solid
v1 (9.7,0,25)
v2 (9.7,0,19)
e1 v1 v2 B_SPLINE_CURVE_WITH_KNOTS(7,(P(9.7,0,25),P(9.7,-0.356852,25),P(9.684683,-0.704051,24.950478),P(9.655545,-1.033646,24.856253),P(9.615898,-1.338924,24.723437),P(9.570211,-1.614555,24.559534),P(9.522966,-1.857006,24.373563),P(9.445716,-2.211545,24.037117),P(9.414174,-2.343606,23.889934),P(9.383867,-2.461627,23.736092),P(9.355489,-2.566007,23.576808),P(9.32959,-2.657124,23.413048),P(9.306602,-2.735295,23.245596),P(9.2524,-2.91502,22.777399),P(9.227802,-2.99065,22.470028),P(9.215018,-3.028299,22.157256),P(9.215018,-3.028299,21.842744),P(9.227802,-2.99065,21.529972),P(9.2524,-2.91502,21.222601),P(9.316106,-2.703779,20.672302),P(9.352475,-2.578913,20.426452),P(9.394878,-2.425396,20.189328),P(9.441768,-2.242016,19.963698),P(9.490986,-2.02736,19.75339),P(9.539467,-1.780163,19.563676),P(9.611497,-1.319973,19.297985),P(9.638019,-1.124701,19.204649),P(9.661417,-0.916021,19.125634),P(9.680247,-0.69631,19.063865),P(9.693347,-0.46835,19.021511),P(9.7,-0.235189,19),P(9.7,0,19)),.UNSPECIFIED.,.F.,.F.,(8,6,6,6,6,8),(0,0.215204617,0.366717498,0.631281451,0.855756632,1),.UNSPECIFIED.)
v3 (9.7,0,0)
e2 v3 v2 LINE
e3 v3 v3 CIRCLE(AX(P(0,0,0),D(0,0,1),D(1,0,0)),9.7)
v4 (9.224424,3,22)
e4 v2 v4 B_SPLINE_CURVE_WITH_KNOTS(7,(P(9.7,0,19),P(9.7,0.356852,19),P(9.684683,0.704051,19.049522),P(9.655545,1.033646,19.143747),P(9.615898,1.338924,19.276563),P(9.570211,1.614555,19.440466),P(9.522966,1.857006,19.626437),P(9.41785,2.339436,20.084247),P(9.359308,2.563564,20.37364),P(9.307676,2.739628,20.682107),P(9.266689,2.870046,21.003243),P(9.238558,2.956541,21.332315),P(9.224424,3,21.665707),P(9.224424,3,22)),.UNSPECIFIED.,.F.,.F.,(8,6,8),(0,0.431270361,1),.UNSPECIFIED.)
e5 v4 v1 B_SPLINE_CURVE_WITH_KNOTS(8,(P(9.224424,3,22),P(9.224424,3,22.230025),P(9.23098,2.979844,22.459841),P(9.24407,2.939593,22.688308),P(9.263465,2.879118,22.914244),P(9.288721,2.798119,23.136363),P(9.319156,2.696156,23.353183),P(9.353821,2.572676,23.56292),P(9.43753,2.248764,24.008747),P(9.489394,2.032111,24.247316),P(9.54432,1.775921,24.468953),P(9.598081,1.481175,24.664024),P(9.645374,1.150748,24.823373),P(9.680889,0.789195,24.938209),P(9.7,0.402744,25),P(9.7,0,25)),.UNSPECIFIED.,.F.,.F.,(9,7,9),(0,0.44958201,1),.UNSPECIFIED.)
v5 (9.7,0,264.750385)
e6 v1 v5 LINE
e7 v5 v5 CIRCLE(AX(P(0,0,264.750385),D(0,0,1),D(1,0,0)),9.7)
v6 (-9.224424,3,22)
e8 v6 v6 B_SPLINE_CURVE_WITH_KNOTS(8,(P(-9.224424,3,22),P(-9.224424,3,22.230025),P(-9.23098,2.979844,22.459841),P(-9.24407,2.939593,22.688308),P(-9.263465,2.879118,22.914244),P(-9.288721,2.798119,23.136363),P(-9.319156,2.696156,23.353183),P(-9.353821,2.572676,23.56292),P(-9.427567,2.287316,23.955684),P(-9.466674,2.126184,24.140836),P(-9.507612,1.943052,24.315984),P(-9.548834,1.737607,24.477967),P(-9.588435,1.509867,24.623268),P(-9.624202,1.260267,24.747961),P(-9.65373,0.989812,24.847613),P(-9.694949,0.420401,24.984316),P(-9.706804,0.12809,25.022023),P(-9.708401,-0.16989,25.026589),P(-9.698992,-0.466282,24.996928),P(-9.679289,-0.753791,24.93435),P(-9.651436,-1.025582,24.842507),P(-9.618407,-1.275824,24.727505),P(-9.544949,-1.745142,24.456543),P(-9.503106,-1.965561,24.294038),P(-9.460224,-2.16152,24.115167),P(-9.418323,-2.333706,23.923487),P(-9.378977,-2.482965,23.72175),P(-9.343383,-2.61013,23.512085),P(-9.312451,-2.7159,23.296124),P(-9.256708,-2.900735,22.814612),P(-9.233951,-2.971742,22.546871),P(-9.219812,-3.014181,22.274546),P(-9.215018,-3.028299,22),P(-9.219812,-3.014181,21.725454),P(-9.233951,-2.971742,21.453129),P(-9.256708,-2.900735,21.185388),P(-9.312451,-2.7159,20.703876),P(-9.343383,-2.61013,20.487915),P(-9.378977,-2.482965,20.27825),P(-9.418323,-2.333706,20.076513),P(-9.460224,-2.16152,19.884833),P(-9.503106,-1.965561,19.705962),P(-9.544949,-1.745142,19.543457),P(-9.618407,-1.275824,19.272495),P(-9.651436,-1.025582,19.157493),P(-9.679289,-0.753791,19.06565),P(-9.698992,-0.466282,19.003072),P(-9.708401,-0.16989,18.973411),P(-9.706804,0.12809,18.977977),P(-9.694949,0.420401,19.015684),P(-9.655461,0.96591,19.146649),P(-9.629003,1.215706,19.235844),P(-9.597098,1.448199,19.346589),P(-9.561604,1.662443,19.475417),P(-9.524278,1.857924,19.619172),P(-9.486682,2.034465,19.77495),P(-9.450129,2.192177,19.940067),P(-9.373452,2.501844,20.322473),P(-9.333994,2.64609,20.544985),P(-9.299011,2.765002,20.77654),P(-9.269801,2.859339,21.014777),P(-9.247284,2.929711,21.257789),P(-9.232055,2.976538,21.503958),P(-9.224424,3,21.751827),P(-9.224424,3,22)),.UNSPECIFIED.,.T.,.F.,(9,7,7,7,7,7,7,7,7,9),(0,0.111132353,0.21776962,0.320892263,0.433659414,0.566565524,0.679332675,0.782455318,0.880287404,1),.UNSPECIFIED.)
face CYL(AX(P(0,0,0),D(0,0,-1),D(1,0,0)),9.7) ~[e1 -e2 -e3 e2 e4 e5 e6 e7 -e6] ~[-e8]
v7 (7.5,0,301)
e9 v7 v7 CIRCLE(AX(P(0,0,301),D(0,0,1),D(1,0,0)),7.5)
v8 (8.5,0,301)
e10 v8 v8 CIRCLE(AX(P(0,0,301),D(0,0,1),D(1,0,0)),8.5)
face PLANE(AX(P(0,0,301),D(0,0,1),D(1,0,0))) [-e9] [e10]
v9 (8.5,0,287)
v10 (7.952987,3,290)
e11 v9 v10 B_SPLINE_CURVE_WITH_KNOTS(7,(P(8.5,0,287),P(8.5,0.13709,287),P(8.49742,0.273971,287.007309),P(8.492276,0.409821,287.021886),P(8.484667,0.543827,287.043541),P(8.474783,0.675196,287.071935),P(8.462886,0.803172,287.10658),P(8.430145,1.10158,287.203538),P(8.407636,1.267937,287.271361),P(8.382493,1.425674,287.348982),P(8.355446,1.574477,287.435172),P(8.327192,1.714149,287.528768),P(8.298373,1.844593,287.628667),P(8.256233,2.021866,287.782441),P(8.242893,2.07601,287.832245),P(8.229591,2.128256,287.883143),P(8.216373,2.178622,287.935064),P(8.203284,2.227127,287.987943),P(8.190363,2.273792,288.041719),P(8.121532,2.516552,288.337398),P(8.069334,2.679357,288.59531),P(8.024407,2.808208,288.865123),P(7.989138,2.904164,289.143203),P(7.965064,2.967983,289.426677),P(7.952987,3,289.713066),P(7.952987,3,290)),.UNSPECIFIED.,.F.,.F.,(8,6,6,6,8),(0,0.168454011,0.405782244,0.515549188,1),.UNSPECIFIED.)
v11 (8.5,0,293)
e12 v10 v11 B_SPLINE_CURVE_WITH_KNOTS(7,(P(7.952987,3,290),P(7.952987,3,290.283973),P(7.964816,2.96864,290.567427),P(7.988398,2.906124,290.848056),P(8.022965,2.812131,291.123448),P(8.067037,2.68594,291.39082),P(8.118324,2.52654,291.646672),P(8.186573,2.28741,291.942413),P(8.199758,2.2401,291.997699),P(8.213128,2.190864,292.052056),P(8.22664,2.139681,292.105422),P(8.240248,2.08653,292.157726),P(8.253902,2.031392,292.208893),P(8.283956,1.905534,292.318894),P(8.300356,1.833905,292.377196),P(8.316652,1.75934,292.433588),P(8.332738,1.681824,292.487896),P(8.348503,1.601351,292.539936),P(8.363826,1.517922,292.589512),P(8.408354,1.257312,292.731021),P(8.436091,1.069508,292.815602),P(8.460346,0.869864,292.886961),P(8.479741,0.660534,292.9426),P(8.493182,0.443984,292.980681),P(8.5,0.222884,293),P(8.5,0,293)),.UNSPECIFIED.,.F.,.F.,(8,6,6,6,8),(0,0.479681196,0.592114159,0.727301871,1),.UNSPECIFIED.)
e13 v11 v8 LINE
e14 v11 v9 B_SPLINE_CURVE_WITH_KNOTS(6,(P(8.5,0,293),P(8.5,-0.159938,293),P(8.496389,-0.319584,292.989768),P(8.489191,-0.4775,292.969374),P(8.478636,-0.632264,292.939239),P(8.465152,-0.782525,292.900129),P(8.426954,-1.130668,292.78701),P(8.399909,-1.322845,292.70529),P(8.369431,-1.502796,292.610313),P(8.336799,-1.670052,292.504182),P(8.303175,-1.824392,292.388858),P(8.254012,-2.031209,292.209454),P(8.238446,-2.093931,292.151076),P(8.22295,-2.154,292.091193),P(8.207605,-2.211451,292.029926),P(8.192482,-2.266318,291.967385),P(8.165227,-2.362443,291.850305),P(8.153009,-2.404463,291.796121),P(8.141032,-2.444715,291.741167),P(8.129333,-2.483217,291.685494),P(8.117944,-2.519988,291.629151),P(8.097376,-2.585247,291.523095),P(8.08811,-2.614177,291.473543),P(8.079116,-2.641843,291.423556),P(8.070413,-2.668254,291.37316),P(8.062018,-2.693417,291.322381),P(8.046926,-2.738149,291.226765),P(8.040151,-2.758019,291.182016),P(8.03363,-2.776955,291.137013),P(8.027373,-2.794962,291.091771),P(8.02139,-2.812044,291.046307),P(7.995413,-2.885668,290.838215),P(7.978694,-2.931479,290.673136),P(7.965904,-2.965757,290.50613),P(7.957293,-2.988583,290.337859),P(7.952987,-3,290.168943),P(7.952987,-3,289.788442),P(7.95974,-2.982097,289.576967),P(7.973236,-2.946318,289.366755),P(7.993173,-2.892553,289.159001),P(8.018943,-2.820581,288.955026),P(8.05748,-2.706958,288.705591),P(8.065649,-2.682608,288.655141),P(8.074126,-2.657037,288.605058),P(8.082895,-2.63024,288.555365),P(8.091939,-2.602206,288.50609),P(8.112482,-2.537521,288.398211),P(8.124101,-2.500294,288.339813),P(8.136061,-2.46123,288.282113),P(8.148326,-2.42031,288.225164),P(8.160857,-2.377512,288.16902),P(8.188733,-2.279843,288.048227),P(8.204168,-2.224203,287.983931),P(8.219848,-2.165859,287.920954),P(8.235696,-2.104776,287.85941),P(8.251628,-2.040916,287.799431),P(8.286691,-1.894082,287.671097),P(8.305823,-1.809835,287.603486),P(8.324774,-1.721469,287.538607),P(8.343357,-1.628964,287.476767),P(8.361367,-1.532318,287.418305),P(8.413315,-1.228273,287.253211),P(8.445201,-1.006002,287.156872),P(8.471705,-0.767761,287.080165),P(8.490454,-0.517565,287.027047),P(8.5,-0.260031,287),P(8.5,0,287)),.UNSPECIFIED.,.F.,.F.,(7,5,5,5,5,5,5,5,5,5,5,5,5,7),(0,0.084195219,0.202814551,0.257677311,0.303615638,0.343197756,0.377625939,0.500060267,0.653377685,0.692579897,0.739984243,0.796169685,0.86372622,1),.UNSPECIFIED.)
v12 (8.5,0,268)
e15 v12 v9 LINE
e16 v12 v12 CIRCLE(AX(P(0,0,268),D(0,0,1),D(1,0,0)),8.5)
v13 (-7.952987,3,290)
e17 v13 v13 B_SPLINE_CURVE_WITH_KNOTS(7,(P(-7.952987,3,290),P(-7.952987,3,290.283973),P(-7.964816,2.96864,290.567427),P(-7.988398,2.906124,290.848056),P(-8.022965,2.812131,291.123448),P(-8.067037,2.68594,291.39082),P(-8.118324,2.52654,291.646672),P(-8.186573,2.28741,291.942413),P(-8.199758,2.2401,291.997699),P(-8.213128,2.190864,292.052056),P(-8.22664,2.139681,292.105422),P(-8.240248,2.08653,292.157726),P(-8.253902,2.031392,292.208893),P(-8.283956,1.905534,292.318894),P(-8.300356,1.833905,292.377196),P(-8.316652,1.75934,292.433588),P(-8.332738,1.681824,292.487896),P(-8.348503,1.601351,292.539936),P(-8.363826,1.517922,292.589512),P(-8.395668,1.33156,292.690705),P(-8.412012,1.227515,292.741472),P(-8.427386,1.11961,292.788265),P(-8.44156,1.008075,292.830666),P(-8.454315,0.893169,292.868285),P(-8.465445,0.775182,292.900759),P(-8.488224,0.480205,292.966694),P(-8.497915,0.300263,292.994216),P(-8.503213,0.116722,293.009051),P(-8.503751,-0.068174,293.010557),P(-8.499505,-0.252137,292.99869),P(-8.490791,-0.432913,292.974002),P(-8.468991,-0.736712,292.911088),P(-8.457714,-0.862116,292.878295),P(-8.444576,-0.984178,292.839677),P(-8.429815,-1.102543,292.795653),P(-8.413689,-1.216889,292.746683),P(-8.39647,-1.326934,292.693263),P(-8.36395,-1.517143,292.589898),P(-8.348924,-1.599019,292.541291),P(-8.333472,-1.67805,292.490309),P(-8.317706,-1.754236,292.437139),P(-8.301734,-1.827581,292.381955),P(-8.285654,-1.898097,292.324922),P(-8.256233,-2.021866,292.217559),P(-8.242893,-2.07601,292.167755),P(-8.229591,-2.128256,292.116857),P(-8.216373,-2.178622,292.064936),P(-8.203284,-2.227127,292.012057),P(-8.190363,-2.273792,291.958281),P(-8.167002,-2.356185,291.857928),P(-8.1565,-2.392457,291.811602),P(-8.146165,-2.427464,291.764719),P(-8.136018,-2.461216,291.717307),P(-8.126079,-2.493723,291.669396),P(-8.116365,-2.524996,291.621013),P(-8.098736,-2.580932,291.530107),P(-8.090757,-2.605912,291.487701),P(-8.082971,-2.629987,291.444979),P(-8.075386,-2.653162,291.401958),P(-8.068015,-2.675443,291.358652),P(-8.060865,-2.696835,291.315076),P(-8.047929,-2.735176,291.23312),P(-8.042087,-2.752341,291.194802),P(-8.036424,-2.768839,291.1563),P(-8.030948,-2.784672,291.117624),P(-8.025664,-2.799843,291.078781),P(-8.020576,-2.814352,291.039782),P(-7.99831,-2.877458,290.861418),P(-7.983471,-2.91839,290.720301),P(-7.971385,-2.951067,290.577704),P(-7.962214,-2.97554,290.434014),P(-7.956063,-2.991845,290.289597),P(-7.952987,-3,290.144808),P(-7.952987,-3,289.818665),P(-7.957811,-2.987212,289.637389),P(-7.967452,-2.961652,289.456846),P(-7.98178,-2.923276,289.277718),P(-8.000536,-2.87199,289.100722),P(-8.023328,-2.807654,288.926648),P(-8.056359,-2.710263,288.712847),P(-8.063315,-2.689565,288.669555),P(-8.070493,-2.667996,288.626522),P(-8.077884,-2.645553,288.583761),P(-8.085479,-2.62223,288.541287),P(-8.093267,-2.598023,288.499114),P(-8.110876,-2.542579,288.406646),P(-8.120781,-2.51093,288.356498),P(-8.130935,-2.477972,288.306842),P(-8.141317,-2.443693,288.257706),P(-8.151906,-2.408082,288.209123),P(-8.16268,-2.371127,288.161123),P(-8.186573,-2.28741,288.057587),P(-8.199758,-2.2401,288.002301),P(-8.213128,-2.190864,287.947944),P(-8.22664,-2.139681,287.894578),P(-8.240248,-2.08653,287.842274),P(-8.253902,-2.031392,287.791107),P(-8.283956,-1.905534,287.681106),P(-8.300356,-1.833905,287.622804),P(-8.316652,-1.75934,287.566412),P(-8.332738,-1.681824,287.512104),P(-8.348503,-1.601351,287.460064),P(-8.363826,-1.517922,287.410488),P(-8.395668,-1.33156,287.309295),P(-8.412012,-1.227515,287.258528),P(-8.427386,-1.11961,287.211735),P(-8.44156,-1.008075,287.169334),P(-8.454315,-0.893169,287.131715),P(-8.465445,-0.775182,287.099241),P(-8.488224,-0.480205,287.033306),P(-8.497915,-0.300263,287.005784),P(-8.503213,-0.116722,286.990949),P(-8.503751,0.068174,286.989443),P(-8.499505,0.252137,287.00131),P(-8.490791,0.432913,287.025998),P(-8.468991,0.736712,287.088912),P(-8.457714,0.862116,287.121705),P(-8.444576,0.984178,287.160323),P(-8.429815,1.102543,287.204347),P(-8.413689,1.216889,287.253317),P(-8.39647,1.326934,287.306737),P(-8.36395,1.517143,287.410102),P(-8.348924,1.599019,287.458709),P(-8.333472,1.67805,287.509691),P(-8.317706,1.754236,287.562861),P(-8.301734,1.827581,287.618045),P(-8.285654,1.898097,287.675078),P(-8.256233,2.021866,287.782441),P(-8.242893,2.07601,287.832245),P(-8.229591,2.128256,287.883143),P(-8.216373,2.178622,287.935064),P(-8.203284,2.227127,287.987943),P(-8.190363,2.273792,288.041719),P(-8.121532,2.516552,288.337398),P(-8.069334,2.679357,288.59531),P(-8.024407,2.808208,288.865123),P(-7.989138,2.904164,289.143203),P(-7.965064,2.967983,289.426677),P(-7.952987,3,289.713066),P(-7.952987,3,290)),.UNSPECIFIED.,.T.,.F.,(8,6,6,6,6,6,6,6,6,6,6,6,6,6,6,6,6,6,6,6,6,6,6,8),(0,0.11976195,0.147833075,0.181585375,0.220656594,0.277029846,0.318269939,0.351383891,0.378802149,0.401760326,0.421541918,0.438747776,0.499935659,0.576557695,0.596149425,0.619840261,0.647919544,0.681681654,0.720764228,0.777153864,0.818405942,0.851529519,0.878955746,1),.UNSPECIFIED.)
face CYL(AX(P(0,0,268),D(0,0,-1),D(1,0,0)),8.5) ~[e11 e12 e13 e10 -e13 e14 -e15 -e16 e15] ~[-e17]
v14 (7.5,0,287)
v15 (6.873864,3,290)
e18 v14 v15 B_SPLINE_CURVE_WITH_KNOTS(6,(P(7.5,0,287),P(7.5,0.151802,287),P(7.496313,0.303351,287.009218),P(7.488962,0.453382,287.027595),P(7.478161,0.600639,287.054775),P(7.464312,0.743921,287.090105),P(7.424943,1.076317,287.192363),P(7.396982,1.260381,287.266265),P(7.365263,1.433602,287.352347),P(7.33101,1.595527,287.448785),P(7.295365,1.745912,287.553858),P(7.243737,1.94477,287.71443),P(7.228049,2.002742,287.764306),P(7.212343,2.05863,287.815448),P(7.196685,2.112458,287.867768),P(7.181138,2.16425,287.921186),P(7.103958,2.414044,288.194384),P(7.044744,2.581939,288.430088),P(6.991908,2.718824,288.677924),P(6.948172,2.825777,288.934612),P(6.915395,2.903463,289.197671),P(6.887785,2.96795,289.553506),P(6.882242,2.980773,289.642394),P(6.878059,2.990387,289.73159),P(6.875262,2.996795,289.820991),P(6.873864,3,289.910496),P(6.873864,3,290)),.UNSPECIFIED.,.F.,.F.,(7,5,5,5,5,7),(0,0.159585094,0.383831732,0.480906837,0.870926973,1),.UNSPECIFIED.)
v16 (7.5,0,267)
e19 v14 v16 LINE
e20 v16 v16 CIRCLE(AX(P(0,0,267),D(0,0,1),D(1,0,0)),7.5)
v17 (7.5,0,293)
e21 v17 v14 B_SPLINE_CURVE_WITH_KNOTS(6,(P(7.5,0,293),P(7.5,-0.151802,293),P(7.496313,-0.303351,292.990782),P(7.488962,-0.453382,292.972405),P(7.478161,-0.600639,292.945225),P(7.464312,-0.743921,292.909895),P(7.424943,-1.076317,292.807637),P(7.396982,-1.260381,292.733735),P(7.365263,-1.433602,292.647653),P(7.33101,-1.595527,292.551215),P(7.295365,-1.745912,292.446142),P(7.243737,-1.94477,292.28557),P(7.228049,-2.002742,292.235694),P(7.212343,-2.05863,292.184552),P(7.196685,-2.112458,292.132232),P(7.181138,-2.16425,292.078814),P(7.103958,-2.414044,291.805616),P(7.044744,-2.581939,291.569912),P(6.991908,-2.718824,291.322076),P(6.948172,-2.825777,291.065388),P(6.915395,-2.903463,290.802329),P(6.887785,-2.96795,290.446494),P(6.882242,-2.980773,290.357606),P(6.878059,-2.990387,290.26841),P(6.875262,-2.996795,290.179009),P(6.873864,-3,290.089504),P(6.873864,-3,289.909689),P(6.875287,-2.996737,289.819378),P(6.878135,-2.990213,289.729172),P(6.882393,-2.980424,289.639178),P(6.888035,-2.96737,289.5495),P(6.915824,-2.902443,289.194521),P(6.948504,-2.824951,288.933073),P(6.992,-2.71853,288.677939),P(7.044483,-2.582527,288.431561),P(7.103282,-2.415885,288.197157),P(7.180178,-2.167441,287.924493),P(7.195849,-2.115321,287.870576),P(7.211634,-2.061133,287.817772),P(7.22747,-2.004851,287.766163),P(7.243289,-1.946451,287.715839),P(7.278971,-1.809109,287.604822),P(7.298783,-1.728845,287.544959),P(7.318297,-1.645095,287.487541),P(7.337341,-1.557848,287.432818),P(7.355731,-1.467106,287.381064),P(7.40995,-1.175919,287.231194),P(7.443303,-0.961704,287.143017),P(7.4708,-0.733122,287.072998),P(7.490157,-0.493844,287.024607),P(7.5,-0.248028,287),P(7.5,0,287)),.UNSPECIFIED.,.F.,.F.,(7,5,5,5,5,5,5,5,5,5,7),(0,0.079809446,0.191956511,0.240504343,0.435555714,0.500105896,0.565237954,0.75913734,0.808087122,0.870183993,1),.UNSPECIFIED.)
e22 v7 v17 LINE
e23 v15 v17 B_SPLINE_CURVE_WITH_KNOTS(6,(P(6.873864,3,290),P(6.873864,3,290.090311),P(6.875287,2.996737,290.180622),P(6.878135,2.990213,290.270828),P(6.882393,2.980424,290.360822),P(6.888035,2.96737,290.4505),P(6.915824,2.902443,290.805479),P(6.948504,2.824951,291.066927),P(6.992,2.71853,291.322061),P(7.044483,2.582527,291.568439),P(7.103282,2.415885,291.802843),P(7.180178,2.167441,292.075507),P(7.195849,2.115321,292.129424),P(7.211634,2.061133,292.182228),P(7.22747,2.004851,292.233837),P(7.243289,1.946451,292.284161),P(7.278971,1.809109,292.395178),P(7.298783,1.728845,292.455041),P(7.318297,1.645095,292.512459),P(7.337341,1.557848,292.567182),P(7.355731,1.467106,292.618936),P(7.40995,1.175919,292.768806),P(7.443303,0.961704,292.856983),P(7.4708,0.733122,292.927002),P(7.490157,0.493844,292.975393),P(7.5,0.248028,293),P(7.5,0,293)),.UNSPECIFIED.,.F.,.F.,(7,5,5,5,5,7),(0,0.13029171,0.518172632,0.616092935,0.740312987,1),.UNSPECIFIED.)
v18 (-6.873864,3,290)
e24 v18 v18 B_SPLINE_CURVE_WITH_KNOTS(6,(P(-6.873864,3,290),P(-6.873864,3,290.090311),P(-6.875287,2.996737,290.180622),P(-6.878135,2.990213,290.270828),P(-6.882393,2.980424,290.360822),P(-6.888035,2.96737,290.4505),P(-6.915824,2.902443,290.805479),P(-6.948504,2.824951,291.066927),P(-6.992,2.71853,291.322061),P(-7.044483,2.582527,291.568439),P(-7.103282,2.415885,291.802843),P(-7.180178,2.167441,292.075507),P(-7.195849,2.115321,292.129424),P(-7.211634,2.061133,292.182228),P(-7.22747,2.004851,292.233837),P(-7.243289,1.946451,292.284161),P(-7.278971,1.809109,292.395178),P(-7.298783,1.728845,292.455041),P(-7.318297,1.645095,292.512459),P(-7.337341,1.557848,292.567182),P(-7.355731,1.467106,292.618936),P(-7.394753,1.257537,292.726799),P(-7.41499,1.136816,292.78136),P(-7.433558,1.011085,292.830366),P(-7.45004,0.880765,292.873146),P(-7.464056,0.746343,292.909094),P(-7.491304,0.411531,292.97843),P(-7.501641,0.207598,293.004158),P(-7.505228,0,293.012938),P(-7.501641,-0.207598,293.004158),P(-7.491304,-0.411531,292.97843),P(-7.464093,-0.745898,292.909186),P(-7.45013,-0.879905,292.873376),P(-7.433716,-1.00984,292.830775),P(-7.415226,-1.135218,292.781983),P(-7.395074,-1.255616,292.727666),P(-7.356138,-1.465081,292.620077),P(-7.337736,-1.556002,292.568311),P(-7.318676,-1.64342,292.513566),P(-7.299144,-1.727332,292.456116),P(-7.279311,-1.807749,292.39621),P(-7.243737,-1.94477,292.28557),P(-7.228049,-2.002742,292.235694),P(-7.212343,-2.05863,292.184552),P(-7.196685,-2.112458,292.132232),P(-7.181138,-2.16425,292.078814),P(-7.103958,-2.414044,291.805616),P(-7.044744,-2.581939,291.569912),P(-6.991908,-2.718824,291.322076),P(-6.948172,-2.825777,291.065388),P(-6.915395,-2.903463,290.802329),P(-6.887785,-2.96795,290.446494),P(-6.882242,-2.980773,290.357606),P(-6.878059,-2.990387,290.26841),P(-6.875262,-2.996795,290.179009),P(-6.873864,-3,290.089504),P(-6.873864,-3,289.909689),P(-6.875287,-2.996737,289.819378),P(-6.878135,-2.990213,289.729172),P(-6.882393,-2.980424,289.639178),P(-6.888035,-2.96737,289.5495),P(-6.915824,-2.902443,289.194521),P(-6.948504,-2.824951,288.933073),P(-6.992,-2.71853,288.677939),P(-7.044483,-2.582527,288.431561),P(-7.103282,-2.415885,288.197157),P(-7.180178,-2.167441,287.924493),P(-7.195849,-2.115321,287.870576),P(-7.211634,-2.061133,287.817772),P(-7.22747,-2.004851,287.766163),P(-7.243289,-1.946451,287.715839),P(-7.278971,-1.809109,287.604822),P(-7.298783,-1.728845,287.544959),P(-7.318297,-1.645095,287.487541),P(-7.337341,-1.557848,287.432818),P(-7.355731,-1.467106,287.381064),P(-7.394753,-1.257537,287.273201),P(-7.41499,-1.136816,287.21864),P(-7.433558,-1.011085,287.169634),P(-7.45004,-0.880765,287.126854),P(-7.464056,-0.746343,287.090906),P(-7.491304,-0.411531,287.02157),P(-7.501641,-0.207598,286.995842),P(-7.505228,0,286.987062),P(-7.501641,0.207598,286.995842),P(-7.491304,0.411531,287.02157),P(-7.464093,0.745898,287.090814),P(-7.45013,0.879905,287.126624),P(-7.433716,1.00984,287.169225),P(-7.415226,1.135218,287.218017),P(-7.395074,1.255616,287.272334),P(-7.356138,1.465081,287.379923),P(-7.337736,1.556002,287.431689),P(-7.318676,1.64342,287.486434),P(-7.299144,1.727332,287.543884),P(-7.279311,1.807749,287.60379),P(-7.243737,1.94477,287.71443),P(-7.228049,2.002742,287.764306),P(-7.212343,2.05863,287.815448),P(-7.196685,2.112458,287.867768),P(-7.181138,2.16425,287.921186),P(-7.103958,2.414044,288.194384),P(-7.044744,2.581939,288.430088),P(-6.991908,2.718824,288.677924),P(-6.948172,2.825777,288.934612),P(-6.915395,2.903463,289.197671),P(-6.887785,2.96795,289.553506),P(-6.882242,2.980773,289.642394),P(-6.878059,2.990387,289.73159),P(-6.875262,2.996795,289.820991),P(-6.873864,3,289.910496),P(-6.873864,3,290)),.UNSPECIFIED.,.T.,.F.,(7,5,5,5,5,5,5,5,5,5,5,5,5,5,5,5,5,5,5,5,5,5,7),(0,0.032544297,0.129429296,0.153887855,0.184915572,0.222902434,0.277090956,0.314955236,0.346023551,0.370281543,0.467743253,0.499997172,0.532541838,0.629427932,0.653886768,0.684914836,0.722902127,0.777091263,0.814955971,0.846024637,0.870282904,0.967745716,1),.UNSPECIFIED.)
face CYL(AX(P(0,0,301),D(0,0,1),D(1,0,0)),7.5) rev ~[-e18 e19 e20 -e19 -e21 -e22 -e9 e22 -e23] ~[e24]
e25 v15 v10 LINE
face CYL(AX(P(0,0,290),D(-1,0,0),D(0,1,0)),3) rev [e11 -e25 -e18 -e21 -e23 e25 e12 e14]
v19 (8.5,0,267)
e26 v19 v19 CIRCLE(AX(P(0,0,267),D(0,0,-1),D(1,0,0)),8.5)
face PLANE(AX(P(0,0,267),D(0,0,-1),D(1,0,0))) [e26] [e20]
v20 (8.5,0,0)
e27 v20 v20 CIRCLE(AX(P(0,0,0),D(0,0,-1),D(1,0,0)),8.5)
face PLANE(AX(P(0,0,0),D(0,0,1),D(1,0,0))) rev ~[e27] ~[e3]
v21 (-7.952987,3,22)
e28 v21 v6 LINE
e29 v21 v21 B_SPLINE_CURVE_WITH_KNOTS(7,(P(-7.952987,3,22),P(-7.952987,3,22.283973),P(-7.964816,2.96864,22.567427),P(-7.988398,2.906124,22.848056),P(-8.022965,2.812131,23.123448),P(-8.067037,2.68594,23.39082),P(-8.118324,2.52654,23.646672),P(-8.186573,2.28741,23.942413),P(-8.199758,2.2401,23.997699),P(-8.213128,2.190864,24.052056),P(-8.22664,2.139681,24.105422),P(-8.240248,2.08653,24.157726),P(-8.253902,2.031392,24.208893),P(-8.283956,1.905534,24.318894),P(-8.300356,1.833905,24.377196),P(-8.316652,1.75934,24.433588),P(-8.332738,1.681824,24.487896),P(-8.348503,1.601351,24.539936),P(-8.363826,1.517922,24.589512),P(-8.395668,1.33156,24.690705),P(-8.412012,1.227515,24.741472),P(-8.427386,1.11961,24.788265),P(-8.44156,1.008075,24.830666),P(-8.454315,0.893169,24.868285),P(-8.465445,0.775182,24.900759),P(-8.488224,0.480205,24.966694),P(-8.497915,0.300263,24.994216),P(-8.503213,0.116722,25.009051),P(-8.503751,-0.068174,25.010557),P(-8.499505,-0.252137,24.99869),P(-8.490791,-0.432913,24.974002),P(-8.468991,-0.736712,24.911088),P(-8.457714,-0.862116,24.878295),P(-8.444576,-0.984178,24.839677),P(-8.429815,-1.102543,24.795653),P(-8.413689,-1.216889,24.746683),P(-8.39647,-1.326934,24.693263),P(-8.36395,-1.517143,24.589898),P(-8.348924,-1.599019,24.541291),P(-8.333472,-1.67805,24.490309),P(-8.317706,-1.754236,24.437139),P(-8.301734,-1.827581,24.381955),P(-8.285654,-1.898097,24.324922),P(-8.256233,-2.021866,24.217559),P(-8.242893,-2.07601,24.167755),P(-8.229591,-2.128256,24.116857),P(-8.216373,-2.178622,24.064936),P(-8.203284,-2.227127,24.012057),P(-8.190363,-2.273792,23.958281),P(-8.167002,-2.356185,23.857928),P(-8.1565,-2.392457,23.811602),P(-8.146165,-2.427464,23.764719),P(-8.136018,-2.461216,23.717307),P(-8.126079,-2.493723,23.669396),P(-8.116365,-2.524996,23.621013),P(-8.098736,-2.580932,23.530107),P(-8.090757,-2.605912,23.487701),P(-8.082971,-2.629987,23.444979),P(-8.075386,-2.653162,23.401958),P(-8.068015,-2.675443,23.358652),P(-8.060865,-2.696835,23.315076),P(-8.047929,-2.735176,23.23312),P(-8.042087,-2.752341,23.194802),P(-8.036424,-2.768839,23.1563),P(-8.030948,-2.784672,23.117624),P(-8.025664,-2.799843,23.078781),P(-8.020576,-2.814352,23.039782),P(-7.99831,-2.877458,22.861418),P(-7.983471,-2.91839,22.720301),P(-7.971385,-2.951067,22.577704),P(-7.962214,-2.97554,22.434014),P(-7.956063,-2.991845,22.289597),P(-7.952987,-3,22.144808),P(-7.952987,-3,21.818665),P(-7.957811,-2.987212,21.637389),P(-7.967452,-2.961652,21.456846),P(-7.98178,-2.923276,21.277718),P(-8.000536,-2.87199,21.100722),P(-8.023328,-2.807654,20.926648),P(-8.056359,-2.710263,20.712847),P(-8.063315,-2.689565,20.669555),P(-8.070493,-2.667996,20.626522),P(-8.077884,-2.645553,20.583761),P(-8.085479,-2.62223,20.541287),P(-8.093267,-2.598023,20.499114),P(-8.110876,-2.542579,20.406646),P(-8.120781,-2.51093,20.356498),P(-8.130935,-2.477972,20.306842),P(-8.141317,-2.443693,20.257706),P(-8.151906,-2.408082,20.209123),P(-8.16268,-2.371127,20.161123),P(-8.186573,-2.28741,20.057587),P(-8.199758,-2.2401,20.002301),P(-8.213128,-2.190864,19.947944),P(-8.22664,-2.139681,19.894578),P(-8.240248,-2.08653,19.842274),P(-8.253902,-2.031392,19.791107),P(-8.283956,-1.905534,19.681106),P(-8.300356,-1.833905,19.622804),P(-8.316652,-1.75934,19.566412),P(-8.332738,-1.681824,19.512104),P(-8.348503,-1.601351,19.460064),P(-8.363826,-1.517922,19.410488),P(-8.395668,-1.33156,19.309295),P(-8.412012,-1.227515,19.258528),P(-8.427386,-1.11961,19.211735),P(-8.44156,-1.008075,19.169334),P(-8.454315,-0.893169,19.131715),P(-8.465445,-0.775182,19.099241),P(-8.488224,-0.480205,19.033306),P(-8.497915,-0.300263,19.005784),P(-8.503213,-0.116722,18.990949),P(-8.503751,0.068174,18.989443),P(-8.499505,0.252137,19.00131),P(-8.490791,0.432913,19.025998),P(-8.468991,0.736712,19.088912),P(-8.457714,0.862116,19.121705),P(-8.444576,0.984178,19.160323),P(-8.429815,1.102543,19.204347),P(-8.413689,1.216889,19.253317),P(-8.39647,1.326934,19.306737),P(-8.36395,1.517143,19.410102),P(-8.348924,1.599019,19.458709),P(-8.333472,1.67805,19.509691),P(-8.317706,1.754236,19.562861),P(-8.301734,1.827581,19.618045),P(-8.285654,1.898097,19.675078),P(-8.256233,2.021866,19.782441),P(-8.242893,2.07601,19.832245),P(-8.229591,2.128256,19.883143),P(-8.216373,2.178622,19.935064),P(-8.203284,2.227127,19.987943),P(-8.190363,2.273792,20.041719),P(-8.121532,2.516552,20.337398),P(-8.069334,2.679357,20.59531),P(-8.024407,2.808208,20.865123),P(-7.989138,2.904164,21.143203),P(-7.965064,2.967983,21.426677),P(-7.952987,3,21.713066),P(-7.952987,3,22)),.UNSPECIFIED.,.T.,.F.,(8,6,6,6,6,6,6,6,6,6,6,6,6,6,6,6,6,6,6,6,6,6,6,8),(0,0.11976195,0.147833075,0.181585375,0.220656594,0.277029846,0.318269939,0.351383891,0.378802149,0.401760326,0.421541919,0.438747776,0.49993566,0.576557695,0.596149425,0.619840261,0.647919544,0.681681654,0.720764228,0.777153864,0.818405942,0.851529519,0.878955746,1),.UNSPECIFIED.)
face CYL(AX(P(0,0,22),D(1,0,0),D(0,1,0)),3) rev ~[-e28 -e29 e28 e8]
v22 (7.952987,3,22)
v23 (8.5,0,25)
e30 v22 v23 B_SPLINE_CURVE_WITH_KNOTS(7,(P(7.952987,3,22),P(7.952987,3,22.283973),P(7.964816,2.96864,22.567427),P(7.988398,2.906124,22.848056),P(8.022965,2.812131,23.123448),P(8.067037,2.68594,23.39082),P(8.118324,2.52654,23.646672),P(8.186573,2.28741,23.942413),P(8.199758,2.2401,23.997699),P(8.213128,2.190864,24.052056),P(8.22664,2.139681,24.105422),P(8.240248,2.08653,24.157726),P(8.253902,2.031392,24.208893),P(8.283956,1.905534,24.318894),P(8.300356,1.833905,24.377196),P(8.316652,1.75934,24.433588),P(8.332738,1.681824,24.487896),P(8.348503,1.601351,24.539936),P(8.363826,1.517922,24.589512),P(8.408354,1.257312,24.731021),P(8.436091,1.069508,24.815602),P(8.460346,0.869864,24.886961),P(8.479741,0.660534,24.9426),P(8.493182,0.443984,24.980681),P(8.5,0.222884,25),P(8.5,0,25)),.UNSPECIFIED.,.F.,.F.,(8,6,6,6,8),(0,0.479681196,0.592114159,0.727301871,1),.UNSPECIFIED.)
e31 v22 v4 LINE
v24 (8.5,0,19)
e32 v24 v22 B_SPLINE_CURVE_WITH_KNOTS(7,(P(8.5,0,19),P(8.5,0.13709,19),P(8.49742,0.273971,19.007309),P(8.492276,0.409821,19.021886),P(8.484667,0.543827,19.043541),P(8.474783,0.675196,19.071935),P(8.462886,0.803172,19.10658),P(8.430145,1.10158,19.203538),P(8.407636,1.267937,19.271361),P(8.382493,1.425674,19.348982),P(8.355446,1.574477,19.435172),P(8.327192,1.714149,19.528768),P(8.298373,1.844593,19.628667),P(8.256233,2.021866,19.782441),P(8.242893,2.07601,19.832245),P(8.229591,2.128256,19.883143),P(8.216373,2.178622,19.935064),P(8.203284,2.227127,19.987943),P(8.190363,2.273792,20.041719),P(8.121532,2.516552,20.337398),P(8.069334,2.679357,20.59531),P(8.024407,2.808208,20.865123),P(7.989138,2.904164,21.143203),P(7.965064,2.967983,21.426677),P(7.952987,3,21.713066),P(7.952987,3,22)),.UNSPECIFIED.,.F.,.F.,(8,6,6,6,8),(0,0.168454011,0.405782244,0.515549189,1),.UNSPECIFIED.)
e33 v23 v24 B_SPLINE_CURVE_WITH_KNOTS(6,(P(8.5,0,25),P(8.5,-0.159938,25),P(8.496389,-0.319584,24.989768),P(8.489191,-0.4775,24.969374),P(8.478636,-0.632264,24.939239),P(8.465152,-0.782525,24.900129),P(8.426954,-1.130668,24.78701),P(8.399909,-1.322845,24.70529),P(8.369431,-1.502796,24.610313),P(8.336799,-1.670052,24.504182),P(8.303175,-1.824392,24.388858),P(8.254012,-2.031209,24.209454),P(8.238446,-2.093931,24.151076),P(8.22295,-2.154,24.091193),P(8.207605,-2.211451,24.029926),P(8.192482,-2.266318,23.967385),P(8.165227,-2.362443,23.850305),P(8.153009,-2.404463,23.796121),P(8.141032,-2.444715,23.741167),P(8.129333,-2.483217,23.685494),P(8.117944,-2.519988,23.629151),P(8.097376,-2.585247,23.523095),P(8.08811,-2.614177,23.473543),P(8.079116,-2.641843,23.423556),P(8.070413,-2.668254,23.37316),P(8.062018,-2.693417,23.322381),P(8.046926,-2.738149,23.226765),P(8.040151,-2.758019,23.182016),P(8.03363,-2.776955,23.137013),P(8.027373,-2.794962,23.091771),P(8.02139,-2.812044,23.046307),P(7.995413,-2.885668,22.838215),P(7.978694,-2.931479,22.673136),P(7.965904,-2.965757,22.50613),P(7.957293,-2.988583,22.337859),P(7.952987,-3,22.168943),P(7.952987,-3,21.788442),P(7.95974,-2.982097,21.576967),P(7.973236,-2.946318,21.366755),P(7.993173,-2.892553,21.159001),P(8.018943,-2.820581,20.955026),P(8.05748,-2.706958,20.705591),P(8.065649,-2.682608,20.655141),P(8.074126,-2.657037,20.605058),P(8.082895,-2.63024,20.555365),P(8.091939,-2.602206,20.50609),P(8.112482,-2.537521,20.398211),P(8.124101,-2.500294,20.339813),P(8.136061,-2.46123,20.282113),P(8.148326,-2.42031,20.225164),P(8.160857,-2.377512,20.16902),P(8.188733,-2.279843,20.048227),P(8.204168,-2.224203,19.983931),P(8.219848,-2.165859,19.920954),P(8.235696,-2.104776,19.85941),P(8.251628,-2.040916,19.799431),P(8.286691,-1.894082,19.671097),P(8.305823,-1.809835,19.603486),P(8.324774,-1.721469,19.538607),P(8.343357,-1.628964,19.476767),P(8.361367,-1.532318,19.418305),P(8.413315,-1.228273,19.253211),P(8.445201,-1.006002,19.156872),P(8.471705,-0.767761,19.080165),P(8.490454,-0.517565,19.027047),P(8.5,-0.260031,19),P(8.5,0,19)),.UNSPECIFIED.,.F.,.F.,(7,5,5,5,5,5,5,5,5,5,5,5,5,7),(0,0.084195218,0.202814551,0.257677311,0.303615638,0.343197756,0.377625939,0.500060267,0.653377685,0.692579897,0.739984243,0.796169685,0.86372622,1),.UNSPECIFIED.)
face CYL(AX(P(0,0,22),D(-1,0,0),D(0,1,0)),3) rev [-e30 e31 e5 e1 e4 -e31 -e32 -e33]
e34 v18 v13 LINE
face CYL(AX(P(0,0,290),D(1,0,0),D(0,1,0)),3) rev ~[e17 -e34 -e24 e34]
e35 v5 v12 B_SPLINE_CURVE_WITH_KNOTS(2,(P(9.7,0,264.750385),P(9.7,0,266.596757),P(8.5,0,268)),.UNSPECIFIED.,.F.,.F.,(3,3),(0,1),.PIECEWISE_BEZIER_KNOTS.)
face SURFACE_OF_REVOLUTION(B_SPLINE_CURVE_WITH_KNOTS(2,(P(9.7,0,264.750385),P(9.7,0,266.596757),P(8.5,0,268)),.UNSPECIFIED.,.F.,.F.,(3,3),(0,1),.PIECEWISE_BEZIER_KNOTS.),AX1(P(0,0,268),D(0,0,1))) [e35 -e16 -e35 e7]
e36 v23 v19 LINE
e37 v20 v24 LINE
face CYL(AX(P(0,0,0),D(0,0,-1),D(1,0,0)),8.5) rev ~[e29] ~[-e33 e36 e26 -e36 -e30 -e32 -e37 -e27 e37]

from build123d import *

# Parameters (mm, degrees)
F0_R          = 9.7
F1_DEPTH      = 268
F2_R          = 8.5
F3_DEPTH      = 33
F5_R          = 7.5
F6_DEPTH      = 36.4
F7_R          = 8.5
F8_DEPTH      = 267
F4_R          = 3
F9_DEPTH      = 25
F9_DEPTH_BACK = 25


# Not quite as in the source:
# - a fillet or chamfer that OpenCascade refuses, or shapes differently, is made with other operations: its cross-section is extruded or revolved along the edge and cut away or added


with BuildPart() as f1:
    # F0 (on Top) → F1 (new body)
    with BuildSketch(Plane.XY):
        Circle(F0_R)
    extrude(amount=F1_DEPTH)

    # F2 (on face) → F3 (join)
    with BuildSketch(Plane.XY.offset(268)):
        Circle(F2_R)
    extrude(amount=F3_DEPTH)

    # F5 (on face) → F6 (cut)
    with BuildSketch(Plane.XY.offset(301)):
        Circle(F5_R)
    extrude(amount=-F6_DEPTH, mode=Mode.SUBTRACT)

    # F7 (on face) → F8 (cut)
    with BuildSketch(Plane(origin=(0, 0, 0), x_dir=(1, 0, 0), z_dir=(0, 0, -1))):
        Circle(F7_R)
    extrude(amount=-F8_DEPTH, mode=Mode.SUBTRACT)

    # F4 (on Right) → F9 (cut, two sides)
    with BuildSketch(Plane.YZ) as f9_sk:
        with Locations((0, 22)):
            Circle(F4_R)
        with Locations((0, 290)):
            Circle(F4_R)
    extrude(amount=-F9_DEPTH, mode=Mode.SUBTRACT)
    extrude(f9_sk.sketch, amount=F9_DEPTH_BACK, mode=Mode.SUBTRACT)

    # F10: fillet of radius 5 on 1 edges, made by hand

    # F10_s1 → F10_t2 (revolve, cut)
    with BuildSketch(Plane.XZ):
        with BuildLine():
            add(Edge.make_bspline(
                [(9.7, 264.7503846381), (9.7, 266.5967570028), (8.5, 268)],
                knots=[0, 0, 0, 1, 1, 1], degree=2, weights=[1, 1, 1]))
            Line((8.5, 268), (8.576, 268.0649923072))
            ThreePointArc((8.576, 268.0649923072), (9.1, 268.1), (9.7, 268.1))
            Line((9.7, 268.1), (9.8, 268))
            Line((9.8, 268), (9.8, 264.7503846381))
            Line((9.8, 264.7503846381), (9.7, 264.7503846381))
        make_face()
    revolve(axis=Axis((0, 0, 268), (0, 0, 1)), mode=Mode.SUBTRACT)


solid = f1.part
